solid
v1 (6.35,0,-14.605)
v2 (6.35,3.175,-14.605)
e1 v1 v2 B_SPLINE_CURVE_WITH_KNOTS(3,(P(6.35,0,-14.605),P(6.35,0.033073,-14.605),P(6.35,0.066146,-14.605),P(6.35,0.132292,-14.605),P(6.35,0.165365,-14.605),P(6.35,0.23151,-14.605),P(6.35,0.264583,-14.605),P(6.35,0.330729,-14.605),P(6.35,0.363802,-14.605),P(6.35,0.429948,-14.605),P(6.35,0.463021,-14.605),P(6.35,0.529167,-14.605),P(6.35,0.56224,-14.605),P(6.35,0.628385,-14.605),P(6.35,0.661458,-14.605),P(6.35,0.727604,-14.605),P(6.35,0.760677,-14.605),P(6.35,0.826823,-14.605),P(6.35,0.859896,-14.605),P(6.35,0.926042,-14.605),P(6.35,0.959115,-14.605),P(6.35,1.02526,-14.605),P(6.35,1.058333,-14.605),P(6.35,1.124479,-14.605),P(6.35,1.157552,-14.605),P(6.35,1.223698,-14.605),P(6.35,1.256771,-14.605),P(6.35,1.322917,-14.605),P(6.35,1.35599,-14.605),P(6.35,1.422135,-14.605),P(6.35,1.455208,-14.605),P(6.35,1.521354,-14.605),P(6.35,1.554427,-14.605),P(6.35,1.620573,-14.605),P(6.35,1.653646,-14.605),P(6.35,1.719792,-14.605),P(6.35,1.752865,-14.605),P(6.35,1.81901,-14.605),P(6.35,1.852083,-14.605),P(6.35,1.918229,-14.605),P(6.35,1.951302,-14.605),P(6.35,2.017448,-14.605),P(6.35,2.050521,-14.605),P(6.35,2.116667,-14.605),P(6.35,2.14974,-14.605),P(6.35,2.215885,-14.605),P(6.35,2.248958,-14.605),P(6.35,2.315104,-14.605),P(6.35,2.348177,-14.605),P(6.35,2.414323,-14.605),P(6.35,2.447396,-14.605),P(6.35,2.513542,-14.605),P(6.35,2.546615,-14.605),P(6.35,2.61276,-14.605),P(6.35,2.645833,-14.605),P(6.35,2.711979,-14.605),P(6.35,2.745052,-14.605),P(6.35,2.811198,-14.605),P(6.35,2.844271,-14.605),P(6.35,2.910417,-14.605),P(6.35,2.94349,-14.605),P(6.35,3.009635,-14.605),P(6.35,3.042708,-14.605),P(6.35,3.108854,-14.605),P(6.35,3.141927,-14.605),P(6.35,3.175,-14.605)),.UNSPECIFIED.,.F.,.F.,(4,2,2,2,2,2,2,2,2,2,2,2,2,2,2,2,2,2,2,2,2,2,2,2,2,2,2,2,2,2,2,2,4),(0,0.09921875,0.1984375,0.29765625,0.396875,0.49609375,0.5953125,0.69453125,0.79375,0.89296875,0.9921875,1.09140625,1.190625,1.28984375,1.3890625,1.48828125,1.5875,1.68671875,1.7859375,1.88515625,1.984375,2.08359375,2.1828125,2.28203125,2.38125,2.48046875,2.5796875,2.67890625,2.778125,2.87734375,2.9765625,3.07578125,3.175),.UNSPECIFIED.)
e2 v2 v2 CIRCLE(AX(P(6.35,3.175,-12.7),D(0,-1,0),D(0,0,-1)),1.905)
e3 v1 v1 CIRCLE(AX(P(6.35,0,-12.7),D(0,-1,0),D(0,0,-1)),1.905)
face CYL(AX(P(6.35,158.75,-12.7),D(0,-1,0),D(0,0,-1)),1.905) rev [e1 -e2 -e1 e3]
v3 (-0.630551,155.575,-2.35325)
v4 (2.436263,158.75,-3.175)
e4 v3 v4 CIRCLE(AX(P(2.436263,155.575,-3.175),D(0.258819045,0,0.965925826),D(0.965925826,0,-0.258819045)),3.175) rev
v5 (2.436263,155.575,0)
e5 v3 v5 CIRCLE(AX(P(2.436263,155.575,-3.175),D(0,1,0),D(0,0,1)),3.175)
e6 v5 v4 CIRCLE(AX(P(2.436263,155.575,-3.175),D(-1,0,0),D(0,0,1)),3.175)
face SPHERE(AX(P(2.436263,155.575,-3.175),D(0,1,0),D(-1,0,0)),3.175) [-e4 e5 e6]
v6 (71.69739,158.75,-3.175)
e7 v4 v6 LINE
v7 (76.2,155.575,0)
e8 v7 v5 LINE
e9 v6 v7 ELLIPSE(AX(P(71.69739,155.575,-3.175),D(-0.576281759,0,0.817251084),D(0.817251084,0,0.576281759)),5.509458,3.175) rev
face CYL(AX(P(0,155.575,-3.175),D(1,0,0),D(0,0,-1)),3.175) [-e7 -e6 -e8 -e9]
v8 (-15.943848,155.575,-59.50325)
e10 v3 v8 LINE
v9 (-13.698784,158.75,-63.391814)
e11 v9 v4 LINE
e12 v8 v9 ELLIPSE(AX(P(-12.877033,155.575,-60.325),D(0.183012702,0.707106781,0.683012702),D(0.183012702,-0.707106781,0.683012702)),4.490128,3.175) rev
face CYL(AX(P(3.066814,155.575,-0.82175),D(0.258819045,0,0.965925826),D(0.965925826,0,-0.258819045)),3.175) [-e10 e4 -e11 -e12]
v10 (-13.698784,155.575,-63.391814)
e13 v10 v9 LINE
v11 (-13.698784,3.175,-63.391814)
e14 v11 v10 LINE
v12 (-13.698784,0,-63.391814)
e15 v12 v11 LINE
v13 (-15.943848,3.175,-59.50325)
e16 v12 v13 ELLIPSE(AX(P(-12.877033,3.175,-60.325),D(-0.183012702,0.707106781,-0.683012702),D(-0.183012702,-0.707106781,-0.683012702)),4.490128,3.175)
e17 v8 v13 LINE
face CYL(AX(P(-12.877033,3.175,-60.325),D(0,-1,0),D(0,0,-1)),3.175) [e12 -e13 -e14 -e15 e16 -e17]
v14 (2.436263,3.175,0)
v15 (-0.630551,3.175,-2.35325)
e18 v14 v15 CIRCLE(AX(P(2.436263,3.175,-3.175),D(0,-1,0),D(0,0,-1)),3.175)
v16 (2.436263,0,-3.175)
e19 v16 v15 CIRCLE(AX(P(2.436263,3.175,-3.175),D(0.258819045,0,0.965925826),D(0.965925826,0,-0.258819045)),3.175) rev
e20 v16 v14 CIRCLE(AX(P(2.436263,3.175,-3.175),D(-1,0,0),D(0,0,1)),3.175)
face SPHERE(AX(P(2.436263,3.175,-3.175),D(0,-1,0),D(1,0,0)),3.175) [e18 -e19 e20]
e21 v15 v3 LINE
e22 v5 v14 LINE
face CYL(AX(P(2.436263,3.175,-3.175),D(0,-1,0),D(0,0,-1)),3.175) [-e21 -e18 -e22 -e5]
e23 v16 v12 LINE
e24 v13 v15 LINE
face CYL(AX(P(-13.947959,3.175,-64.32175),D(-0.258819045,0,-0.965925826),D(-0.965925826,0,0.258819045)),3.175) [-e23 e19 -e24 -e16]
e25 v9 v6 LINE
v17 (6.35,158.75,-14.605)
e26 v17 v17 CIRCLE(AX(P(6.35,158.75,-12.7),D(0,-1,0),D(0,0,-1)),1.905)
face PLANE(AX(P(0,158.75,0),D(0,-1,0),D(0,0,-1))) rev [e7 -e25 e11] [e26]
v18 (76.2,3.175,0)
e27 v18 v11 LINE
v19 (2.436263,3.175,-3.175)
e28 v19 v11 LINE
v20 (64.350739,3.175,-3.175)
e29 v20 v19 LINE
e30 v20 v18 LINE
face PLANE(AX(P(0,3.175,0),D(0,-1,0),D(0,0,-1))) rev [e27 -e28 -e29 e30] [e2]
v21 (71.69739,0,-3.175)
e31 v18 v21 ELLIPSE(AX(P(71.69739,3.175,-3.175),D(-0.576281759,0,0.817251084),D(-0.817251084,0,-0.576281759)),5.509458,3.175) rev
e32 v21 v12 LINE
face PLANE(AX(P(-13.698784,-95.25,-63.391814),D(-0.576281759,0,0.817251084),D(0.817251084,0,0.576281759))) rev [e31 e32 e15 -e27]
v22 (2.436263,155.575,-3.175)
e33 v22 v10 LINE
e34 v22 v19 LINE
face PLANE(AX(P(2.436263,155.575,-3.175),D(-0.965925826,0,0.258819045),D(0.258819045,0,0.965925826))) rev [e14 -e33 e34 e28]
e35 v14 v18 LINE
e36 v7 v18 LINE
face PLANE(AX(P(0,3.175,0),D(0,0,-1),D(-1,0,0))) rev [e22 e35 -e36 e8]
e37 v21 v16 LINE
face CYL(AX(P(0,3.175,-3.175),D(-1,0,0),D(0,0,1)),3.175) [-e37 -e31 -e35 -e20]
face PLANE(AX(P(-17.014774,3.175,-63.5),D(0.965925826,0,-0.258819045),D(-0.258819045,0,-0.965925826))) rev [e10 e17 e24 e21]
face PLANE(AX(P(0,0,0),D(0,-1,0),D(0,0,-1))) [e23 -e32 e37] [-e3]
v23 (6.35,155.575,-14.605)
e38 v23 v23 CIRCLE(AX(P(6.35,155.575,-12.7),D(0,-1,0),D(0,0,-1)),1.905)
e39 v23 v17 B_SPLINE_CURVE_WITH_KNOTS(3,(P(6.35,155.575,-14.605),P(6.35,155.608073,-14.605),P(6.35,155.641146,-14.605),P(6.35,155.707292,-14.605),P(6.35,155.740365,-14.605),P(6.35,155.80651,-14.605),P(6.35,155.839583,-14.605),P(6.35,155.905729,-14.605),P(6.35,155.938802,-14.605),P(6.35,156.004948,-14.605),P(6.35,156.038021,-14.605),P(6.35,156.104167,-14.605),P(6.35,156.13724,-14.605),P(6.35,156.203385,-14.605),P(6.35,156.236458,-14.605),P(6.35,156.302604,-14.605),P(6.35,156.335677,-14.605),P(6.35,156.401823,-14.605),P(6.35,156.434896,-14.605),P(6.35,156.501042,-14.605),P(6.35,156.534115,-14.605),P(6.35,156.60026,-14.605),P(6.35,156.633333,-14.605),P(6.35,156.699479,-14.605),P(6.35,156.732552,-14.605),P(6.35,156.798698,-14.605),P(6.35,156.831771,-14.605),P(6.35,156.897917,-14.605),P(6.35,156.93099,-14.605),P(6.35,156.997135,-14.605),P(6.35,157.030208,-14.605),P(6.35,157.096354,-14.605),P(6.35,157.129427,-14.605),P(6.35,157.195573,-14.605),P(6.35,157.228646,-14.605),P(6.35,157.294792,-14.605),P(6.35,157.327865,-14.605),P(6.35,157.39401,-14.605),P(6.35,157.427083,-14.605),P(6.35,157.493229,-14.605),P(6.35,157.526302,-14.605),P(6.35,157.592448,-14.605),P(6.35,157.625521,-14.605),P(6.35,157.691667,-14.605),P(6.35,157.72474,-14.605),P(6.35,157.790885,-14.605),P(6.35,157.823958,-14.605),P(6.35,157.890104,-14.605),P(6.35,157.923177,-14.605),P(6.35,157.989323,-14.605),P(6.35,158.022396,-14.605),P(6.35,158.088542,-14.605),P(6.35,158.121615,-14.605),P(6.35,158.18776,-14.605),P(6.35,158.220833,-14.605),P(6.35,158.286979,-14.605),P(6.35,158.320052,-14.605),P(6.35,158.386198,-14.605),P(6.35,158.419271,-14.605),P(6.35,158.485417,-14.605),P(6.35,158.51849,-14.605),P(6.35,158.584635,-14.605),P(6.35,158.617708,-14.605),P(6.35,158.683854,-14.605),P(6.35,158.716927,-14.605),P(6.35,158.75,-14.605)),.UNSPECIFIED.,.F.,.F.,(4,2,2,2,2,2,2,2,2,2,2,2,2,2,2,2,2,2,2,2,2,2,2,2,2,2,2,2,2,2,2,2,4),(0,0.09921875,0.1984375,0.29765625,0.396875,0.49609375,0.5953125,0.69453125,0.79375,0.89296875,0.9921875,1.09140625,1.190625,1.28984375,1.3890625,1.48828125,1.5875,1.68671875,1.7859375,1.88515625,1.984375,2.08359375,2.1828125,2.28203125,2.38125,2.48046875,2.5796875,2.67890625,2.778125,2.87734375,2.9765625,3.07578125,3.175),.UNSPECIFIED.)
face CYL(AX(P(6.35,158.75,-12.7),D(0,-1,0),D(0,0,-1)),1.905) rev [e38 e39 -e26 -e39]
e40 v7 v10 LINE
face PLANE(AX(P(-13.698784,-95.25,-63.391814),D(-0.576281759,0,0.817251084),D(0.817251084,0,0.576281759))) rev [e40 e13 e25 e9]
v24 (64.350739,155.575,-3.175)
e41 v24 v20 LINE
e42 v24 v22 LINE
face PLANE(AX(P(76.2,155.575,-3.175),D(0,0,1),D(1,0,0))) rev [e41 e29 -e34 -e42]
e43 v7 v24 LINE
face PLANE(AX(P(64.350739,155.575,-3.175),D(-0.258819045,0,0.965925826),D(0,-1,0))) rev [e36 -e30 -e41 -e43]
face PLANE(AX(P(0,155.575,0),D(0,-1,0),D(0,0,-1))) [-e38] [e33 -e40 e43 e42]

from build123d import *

# Parameters (mm, degrees)
BOSS_EXTRUDE1_DEPTH = 3.175
BOSS_EXTRUDE3_DEPTH = 152.4
BOSS_EXTRUDE4_DEPTH = 3.175
FILLET1_R           = 3.175
CHAMFER1_SIZE2      = 11.849261314
CHAMFER1_SIZE       = 3.175
SKETCH4_R           = 1.905
CUT_EXTRUDE1_DEPTH  = 158.75
CUT_EXTRUDE2_DEPTH  = 254


# Some blends are built 0.0001 mm under size
with BuildPart() as part:
    # Sketch1 → Boss-Extrude1 (new body)
    with BuildSketch(Plane(origin=(0, 0, 0), x_dir=(1, 0, 0), z_dir=(0, 1, 0))):
        Polygon((0, 0), (76.2, 0), (76.2, 63.5), (-17.014773719, 63.5), align=None)
    extrude(amount=BOSS_EXTRUDE1_DEPTH)

    # Sketch2 → Boss-Extrude3 (add)
    with BuildSketch(Plane(origin=(0, 3.175, 0), x_dir=(1, 0, 0), z_dir=(0, 1, 0))):
        Polygon((76.2, 0), (0, 0), (-17.014773719, 63.5), (-13.727771847, 63.5), (2.436263187, 3.175), (76.2, 3.175), align=None)
    extrude(amount=BOSS_EXTRUDE3_DEPTH)

    # Sketch3 → Boss-Extrude4 (add)
    with BuildSketch(Plane(origin=(0, 155.575, 0), x_dir=(1, 0, 0), z_dir=(0, 1, 0))):
        Polygon((-17.014773719, 63.5), (0, 0), (76.2, 0), (76.2, 63.5), align=None)
    extrude(amount=BOSS_EXTRUDE4_DEPTH)

    # Fillet1
    # the kernel refuses this fillet: 3.175 mm, written as the material it takes off along each edge
    with BuildSketch(Plane(origin=(2.436263187, 3.175, -3.175), x_dir=(-0.9659258262890689, 0, 0.2588190451025188), z_dir=(0, -1, 0))) as fillet1_piece_1_section:
        Polygon((0, 0), (FILLET1_R * 1.02, 0), (FILLET1_R * 1.02, -FILLET1_R * 0.782673527739), (FILLET1_R * 0.263995426005, -FILLET1_R * 0.985244342815), align=None)
    fillet1_piece_1 = extrude(amount=FILLET1_R * 1.02, mode=Mode.PRIVATE)
    fillet1_piece_1 = fillet1_piece_1 - Plane(origin=(2.436263187, 3.175, -3.175), x_dir=(0.6087614290087213, 0, -0.7933533402912346), z_dir=(0, -1, 0)) * Sphere(FILLET1_R, mode=Mode.PRIVATE)
    add(fillet1_piece_1, mode=Mode.SUBTRACT)
    with BuildSketch(Plane(origin=(2.436263187, 155.575, -3.175), x_dir=(0, 0, 1), z_dir=(0, 1, 0))) as fillet1_piece_2_section:
        Polygon((0, 0), (FILLET1_R * 1.02, 0), (FILLET1_R * 1.02, -FILLET1_R * 0.782673527739), (FILLET1_R * 0.263995426005, -FILLET1_R * 0.985244342815), align=None)
    fillet1_piece_2 = extrude(amount=FILLET1_R * 1.02, mode=Mode.PRIVATE)
    fillet1_piece_2 = fillet1_piece_2 - Plane(origin=(2.436263187, 155.575, -3.175), x_dir=(0.6087614290087213, 0, -0.7933533402912346), z_dir=(0, 1, 0)) * Sphere(FILLET1_R, mode=Mode.PRIVATE)
    add(fillet1_piece_2, mode=Mode.SUBTRACT)
    with BuildSketch(Plane(origin=(-17.014773719, 158.75, -63.5), x_dir=(1, 0, 0), z_dir=(0, -1, 0))) as fillet1_piece_3:
        with BuildLine():
            CenterArc((FILLET1_R * 1.30322537284, FILLET1_R), FILLET1_R, 165, 105)
            Line((FILLET1_R * 0.337299546552, FILLET1_R * 1.2588190451), (FILLET1_R * 0.317981030026, FILLET1_R * 1.263995426))
            Line((FILLET1_R * 0.317981030026, FILLET1_R * 1.263995426), (-FILLET1_R * 0.0260645074568, -FILLET1_R * 0.02))
            Line((-FILLET1_R * 0.0260645074568, -FILLET1_R * 0.02), (FILLET1_R * 1.30322537284, -FILLET1_R * 0.02))
            Line((FILLET1_R * 1.30322537284, -FILLET1_R * 0.02), (FILLET1_R * 1.30322537284, 0))
        make_face()
    extrude(amount=158.75, mode=Mode.SUBTRACT)
    with BuildSketch(Plane(origin=(2.436263187, 0, 0), x_dir=(0, 1, 0), z_dir=(1, 0, 0))) as fillet1_piece_4:
        with BuildLine():
            CenterArc((FILLET1_R, -FILLET1_R), FILLET1_R, 90, 90)
            Line((0, -FILLET1_R), (-FILLET1_R * 0.02, -FILLET1_R))
            Line((-FILLET1_R * 0.02, -FILLET1_R), (-FILLET1_R * 0.02, FILLET1_R * 0.02))
            Line((-FILLET1_R * 0.02, FILLET1_R * 0.02), (FILLET1_R, FILLET1_R * 0.02))
            Line((FILLET1_R, FILLET1_R * 0.02), (FILLET1_R, 0))
        make_face()
    extrude(amount=73.763736813, mode=Mode.SUBTRACT)
    with BuildSketch(Plane(origin=(-19.06914989, 0, -71.167036246), x_dir=(0.9659258262890688, 0, -0.25881904510251874), z_dir=(0.2588190451025188, 0, 0.9659258262890689))) as fillet1_piece_5_section:
        with BuildLine():
            CenterArc((FILLET1_R, FILLET1_R), FILLET1_R, 180, 90)
            Line((0, FILLET1_R), (-FILLET1_R * 0.02, FILLET1_R))
            Line((-FILLET1_R * 0.02, FILLET1_R), (-FILLET1_R * 0.02, -FILLET1_R * 0.02))
            Line((-FILLET1_R * 0.02, -FILLET1_R * 0.02), (FILLET1_R, -FILLET1_R * 0.02))
            Line((FILLET1_R, -FILLET1_R * 0.02), (FILLET1_R, 0))
        make_face()
    fillet1_piece_5 = extrude(amount=71.241274269, mode=Mode.PRIVATE)
    fillet1_piece_5 = split(fillet1_piece_5, bisect_by=Plane(origin=(-8.105416373, 0.719979608, -63.5), z_dir=(0, 0, 1)), keep=Keep.TOP, mode=Mode.PRIVATE)
    add(fillet1_piece_5, mode=Mode.SUBTRACT)
    with BuildSketch(Plane(origin=(0, 155.575, 0), x_dir=(1, 0, 0), z_dir=(0, -1, 0))) as fillet1_piece_6:
        with BuildLine():
            CenterArc((FILLET1_R * 0.767326987979, -FILLET1_R), FILLET1_R, 90, 75)
            Line((-FILLET1_R * 0.19859883831, -FILLET1_R * 0.741180954897), (-FILLET1_R * 0.217917354836, -FILLET1_R * 0.736004573995))
            Line((-FILLET1_R * 0.217917354836, -FILLET1_R * 0.736004573995), (-FILLET1_R * 0.0153465397596, FILLET1_R * 0.02))
            Line((-FILLET1_R * 0.0153465397596, FILLET1_R * 0.02), (FILLET1_R * 0.767326987979, FILLET1_R * 0.02))
            Line((FILLET1_R * 0.767326987979, FILLET1_R * 0.02), (FILLET1_R * 0.767326987979, 0))
        make_face()
    extrude(amount=152.4, mode=Mode.SUBTRACT)
    with BuildSketch(Plane(origin=(2.436263187, 158.75, 0), x_dir=(0, -1, 0), z_dir=(1, 0, 0))) as fillet1_piece_7:
        with BuildLine():
            CenterArc((FILLET1_R, FILLET1_R), FILLET1_R, 180, 90)
            Line((0, FILLET1_R), (-FILLET1_R * 0.02, FILLET1_R))
            Line((-FILLET1_R * 0.02, FILLET1_R), (-FILLET1_R * 0.02, -FILLET1_R * 0.02))
            Line((-FILLET1_R * 0.02, -FILLET1_R * 0.02), (FILLET1_R, -FILLET1_R * 0.02))
            Line((FILLET1_R, -FILLET1_R * 0.02), (FILLET1_R, 0))
        make_face()
    extrude(amount=73.763736813, mode=Mode.SUBTRACT)
    with BuildSketch(Plane(origin=(-19.06914989, 158.75, -71.167036246), x_dir=(0.9659258262890688, 0, -0.25881904510251874), z_dir=(0.2588190451025188, 0, 0.9659258262890689))) as fillet1_piece_8_section:
        with BuildLine():
            CenterArc((FILLET1_R, -FILLET1_R), FILLET1_R, 90, 90)
            Line((0, -FILLET1_R), (-FILLET1_R * 0.02, -FILLET1_R))
            Line((-FILLET1_R * 0.02, -FILLET1_R), (-FILLET1_R * 0.02, FILLET1_R * 0.02))
            Line((-FILLET1_R * 0.02, FILLET1_R * 0.02), (FILLET1_R, FILLET1_R * 0.02))
            Line((FILLET1_R, FILLET1_R * 0.02), (FILLET1_R, 0))
        make_face()
    fillet1_piece_8 = extrude(amount=71.241274269, mode=Mode.PRIVATE)
    fillet1_piece_8 = split(fillet1_piece_8, bisect_by=Plane(origin=(-8.105416373, 158.030020392, -63.5), z_dir=(0, 0, 1)), keep=Keep.TOP, mode=Mode.PRIVATE)
    add(fillet1_piece_8, mode=Mode.SUBTRACT)
    with BuildSketch(Plane(origin=(-17.014773719, 169.094351397, -63.5), x_dir=(1, 0, 0), z_dir=(0, -1, 0))) as fillet1_piece_9a_section:
        with BuildLine():
            CenterArc((FILLET1_R * 1.30322537284, FILLET1_R), FILLET1_R, 165, 105)
            Line((FILLET1_R * 0.337299546552, FILLET1_R * 1.2588190451), (FILLET1_R * 0.317981030026, FILLET1_R * 1.263995426))
            Line((FILLET1_R * 0.317981030026, FILLET1_R * 1.263995426), (-FILLET1_R * 0.0260645074568, -FILLET1_R * 0.02))
            Line((-FILLET1_R * 0.0260645074568, -FILLET1_R * 0.02), (FILLET1_R * 1.30322537284, -FILLET1_R * 0.02))
            Line((FILLET1_R * 1.30322537284, -FILLET1_R * 0.02), (FILLET1_R * 1.30322537284, 0))
        make_face()
    fillet1_piece_9a = extrude(amount=169.094351397, mode=Mode.PRIVATE)
    fillet1_piece_9a = split(fillet1_piece_9a, bisect_by=Plane(origin=(-15.793777483, 158.75, -62.563096636), z_dir=(0, 1, 0)), keep=Keep.TOP, mode=Mode.PRIVATE)
    with BuildSketch(Plane(origin=(-19.06914989, 158.75, -71.167036246), x_dir=(0.9659258262890688, 0, -0.25881904510251874), z_dir=(0.2588190451025188, 0, 0.9659258262890689))) as fillet1_piece_9b_section:
        with BuildLine():
            CenterArc((FILLET1_R, -FILLET1_R), FILLET1_R, 90, 90)
            Line((0, -FILLET1_R), (-FILLET1_R * 0.02, -FILLET1_R))
            Line((-FILLET1_R * 0.02, -FILLET1_R), (-FILLET1_R * 0.02, FILLET1_R * 0.02))
            Line((-FILLET1_R * 0.02, FILLET1_R * 0.02), (FILLET1_R, FILLET1_R * 0.02))
            Line((FILLET1_R, FILLET1_R * 0.02), (FILLET1_R, 0))
        make_face()
    fillet1_piece_9b = extrude(amount=71.241274269, mode=Mode.PRIVATE)
    fillet1_piece_9b = split(fillet1_piece_9b, bisect_by=Plane(origin=(-17.307274922, 158.04031756, -63.5), z_dir=(0, 0, -1)), keep=Keep.TOP, mode=Mode.PRIVATE)
    fillet1_piece_9 = fillet1_piece_9a & fillet1_piece_9b
    add(fillet1_piece_9, mode=Mode.SUBTRACT)
    with BuildSketch(Plane(origin=(-19.06914989, 0, -71.167036246), x_dir=(0.9659258262890688, 0, -0.25881904510251874), z_dir=(0.2588190451025188, 0, 0.9659258262890689))) as fillet1_piece_10a_section:
        with BuildLine():
            CenterArc((FILLET1_R, FILLET1_R), FILLET1_R, 180, 90)
            Line((0, FILLET1_R), (-FILLET1_R * 0.02, FILLET1_R))
            Line((-FILLET1_R * 0.02, FILLET1_R), (-FILLET1_R * 0.02, -FILLET1_R * 0.02))
            Line((-FILLET1_R * 0.02, -FILLET1_R * 0.02), (FILLET1_R, -FILLET1_R * 0.02))
            Line((FILLET1_R, -FILLET1_R * 0.02), (FILLET1_R, 0))
        make_face()
    fillet1_piece_10a = extrude(amount=71.241274269, mode=Mode.PRIVATE)
    fillet1_piece_10a = split(fillet1_piece_10a, bisect_by=Plane(origin=(-17.307274922, 0.70968244, -63.5), z_dir=(0, 0, -1)), keep=Keep.TOP, mode=Mode.PRIVATE)
    with BuildSketch(Plane(origin=(-17.014773719, 158.75, -63.5), x_dir=(1, 0, 0), z_dir=(0, -1, 0))) as fillet1_piece_10b_section:
        with BuildLine():
            CenterArc((FILLET1_R * 1.30322537284, FILLET1_R), FILLET1_R, 165, 105)
            Line((FILLET1_R * 0.337299546552, FILLET1_R * 1.2588190451), (FILLET1_R * 0.317981030026, FILLET1_R * 1.263995426))
            Line((FILLET1_R * 0.317981030026, FILLET1_R * 1.263995426), (-FILLET1_R * 0.0260645074568, -FILLET1_R * 0.02))
            Line((-FILLET1_R * 0.0260645074568, -FILLET1_R * 0.02), (FILLET1_R * 1.30322537284, -FILLET1_R * 0.02))
            Line((FILLET1_R * 1.30322537284, -FILLET1_R * 0.02), (FILLET1_R * 1.30322537284, 0))
        make_face()
    fillet1_piece_10b = extrude(amount=169.094351397, mode=Mode.PRIVATE)
    fillet1_piece_10b = split(fillet1_piece_10b, bisect_by=Plane(origin=(-15.793777483, 0, -62.563096636), z_dir=(0, -1, 0)), keep=Keep.TOP, mode=Mode.PRIVATE)
    fillet1_piece_10 = fillet1_piece_10a & fillet1_piece_10b
    add(fillet1_piece_10, mode=Mode.SUBTRACT)

    # Chamfer1
    chamfer1_edges = [part.edges().sort_by_distance(p)[0] for p in [
        (76.2, 79.375, -3.175),
    ]]
    chamfer1_side = [part.faces().sort_by_distance(p)[0] for p in [
        (76.2, 79.375, -3.1115),
    ]]
    chamfer(chamfer1_edges, length=CHAMFER1_SIZE - 0.0001, length2=CHAMFER1_SIZE2 - 0.0001, reference=chamfer1_side[0])  # a hair under: the kernel refuses the full size

    # Sketch4 → Cut-Extrude1 (cut)
    with BuildSketch(Plane.XZ):
        with Locations(Location((6.35, -12.7, 0), (0, 0, 270))):
            Circle(SKETCH4_R)
    extrude(amount=-CUT_EXTRUDE1_DEPTH, mode=Mode.SUBTRACT)

    # Sketch6 → Cut-Extrude2 (cut)
    with BuildSketch(Plane(origin=(0, 158.75, 0), x_dir=(1, 0, 0), z_dir=(0, 1, 0))):
        Polygon((-13.698783629, 63.391814498), (76.2, 0), (76.2, 63.5), (-15.882639691, 64.0756894), align=None)
    extrude(amount=-CUT_EXTRUDE2_DEPTH, mode=Mode.SUBTRACT)


solid = part.part
